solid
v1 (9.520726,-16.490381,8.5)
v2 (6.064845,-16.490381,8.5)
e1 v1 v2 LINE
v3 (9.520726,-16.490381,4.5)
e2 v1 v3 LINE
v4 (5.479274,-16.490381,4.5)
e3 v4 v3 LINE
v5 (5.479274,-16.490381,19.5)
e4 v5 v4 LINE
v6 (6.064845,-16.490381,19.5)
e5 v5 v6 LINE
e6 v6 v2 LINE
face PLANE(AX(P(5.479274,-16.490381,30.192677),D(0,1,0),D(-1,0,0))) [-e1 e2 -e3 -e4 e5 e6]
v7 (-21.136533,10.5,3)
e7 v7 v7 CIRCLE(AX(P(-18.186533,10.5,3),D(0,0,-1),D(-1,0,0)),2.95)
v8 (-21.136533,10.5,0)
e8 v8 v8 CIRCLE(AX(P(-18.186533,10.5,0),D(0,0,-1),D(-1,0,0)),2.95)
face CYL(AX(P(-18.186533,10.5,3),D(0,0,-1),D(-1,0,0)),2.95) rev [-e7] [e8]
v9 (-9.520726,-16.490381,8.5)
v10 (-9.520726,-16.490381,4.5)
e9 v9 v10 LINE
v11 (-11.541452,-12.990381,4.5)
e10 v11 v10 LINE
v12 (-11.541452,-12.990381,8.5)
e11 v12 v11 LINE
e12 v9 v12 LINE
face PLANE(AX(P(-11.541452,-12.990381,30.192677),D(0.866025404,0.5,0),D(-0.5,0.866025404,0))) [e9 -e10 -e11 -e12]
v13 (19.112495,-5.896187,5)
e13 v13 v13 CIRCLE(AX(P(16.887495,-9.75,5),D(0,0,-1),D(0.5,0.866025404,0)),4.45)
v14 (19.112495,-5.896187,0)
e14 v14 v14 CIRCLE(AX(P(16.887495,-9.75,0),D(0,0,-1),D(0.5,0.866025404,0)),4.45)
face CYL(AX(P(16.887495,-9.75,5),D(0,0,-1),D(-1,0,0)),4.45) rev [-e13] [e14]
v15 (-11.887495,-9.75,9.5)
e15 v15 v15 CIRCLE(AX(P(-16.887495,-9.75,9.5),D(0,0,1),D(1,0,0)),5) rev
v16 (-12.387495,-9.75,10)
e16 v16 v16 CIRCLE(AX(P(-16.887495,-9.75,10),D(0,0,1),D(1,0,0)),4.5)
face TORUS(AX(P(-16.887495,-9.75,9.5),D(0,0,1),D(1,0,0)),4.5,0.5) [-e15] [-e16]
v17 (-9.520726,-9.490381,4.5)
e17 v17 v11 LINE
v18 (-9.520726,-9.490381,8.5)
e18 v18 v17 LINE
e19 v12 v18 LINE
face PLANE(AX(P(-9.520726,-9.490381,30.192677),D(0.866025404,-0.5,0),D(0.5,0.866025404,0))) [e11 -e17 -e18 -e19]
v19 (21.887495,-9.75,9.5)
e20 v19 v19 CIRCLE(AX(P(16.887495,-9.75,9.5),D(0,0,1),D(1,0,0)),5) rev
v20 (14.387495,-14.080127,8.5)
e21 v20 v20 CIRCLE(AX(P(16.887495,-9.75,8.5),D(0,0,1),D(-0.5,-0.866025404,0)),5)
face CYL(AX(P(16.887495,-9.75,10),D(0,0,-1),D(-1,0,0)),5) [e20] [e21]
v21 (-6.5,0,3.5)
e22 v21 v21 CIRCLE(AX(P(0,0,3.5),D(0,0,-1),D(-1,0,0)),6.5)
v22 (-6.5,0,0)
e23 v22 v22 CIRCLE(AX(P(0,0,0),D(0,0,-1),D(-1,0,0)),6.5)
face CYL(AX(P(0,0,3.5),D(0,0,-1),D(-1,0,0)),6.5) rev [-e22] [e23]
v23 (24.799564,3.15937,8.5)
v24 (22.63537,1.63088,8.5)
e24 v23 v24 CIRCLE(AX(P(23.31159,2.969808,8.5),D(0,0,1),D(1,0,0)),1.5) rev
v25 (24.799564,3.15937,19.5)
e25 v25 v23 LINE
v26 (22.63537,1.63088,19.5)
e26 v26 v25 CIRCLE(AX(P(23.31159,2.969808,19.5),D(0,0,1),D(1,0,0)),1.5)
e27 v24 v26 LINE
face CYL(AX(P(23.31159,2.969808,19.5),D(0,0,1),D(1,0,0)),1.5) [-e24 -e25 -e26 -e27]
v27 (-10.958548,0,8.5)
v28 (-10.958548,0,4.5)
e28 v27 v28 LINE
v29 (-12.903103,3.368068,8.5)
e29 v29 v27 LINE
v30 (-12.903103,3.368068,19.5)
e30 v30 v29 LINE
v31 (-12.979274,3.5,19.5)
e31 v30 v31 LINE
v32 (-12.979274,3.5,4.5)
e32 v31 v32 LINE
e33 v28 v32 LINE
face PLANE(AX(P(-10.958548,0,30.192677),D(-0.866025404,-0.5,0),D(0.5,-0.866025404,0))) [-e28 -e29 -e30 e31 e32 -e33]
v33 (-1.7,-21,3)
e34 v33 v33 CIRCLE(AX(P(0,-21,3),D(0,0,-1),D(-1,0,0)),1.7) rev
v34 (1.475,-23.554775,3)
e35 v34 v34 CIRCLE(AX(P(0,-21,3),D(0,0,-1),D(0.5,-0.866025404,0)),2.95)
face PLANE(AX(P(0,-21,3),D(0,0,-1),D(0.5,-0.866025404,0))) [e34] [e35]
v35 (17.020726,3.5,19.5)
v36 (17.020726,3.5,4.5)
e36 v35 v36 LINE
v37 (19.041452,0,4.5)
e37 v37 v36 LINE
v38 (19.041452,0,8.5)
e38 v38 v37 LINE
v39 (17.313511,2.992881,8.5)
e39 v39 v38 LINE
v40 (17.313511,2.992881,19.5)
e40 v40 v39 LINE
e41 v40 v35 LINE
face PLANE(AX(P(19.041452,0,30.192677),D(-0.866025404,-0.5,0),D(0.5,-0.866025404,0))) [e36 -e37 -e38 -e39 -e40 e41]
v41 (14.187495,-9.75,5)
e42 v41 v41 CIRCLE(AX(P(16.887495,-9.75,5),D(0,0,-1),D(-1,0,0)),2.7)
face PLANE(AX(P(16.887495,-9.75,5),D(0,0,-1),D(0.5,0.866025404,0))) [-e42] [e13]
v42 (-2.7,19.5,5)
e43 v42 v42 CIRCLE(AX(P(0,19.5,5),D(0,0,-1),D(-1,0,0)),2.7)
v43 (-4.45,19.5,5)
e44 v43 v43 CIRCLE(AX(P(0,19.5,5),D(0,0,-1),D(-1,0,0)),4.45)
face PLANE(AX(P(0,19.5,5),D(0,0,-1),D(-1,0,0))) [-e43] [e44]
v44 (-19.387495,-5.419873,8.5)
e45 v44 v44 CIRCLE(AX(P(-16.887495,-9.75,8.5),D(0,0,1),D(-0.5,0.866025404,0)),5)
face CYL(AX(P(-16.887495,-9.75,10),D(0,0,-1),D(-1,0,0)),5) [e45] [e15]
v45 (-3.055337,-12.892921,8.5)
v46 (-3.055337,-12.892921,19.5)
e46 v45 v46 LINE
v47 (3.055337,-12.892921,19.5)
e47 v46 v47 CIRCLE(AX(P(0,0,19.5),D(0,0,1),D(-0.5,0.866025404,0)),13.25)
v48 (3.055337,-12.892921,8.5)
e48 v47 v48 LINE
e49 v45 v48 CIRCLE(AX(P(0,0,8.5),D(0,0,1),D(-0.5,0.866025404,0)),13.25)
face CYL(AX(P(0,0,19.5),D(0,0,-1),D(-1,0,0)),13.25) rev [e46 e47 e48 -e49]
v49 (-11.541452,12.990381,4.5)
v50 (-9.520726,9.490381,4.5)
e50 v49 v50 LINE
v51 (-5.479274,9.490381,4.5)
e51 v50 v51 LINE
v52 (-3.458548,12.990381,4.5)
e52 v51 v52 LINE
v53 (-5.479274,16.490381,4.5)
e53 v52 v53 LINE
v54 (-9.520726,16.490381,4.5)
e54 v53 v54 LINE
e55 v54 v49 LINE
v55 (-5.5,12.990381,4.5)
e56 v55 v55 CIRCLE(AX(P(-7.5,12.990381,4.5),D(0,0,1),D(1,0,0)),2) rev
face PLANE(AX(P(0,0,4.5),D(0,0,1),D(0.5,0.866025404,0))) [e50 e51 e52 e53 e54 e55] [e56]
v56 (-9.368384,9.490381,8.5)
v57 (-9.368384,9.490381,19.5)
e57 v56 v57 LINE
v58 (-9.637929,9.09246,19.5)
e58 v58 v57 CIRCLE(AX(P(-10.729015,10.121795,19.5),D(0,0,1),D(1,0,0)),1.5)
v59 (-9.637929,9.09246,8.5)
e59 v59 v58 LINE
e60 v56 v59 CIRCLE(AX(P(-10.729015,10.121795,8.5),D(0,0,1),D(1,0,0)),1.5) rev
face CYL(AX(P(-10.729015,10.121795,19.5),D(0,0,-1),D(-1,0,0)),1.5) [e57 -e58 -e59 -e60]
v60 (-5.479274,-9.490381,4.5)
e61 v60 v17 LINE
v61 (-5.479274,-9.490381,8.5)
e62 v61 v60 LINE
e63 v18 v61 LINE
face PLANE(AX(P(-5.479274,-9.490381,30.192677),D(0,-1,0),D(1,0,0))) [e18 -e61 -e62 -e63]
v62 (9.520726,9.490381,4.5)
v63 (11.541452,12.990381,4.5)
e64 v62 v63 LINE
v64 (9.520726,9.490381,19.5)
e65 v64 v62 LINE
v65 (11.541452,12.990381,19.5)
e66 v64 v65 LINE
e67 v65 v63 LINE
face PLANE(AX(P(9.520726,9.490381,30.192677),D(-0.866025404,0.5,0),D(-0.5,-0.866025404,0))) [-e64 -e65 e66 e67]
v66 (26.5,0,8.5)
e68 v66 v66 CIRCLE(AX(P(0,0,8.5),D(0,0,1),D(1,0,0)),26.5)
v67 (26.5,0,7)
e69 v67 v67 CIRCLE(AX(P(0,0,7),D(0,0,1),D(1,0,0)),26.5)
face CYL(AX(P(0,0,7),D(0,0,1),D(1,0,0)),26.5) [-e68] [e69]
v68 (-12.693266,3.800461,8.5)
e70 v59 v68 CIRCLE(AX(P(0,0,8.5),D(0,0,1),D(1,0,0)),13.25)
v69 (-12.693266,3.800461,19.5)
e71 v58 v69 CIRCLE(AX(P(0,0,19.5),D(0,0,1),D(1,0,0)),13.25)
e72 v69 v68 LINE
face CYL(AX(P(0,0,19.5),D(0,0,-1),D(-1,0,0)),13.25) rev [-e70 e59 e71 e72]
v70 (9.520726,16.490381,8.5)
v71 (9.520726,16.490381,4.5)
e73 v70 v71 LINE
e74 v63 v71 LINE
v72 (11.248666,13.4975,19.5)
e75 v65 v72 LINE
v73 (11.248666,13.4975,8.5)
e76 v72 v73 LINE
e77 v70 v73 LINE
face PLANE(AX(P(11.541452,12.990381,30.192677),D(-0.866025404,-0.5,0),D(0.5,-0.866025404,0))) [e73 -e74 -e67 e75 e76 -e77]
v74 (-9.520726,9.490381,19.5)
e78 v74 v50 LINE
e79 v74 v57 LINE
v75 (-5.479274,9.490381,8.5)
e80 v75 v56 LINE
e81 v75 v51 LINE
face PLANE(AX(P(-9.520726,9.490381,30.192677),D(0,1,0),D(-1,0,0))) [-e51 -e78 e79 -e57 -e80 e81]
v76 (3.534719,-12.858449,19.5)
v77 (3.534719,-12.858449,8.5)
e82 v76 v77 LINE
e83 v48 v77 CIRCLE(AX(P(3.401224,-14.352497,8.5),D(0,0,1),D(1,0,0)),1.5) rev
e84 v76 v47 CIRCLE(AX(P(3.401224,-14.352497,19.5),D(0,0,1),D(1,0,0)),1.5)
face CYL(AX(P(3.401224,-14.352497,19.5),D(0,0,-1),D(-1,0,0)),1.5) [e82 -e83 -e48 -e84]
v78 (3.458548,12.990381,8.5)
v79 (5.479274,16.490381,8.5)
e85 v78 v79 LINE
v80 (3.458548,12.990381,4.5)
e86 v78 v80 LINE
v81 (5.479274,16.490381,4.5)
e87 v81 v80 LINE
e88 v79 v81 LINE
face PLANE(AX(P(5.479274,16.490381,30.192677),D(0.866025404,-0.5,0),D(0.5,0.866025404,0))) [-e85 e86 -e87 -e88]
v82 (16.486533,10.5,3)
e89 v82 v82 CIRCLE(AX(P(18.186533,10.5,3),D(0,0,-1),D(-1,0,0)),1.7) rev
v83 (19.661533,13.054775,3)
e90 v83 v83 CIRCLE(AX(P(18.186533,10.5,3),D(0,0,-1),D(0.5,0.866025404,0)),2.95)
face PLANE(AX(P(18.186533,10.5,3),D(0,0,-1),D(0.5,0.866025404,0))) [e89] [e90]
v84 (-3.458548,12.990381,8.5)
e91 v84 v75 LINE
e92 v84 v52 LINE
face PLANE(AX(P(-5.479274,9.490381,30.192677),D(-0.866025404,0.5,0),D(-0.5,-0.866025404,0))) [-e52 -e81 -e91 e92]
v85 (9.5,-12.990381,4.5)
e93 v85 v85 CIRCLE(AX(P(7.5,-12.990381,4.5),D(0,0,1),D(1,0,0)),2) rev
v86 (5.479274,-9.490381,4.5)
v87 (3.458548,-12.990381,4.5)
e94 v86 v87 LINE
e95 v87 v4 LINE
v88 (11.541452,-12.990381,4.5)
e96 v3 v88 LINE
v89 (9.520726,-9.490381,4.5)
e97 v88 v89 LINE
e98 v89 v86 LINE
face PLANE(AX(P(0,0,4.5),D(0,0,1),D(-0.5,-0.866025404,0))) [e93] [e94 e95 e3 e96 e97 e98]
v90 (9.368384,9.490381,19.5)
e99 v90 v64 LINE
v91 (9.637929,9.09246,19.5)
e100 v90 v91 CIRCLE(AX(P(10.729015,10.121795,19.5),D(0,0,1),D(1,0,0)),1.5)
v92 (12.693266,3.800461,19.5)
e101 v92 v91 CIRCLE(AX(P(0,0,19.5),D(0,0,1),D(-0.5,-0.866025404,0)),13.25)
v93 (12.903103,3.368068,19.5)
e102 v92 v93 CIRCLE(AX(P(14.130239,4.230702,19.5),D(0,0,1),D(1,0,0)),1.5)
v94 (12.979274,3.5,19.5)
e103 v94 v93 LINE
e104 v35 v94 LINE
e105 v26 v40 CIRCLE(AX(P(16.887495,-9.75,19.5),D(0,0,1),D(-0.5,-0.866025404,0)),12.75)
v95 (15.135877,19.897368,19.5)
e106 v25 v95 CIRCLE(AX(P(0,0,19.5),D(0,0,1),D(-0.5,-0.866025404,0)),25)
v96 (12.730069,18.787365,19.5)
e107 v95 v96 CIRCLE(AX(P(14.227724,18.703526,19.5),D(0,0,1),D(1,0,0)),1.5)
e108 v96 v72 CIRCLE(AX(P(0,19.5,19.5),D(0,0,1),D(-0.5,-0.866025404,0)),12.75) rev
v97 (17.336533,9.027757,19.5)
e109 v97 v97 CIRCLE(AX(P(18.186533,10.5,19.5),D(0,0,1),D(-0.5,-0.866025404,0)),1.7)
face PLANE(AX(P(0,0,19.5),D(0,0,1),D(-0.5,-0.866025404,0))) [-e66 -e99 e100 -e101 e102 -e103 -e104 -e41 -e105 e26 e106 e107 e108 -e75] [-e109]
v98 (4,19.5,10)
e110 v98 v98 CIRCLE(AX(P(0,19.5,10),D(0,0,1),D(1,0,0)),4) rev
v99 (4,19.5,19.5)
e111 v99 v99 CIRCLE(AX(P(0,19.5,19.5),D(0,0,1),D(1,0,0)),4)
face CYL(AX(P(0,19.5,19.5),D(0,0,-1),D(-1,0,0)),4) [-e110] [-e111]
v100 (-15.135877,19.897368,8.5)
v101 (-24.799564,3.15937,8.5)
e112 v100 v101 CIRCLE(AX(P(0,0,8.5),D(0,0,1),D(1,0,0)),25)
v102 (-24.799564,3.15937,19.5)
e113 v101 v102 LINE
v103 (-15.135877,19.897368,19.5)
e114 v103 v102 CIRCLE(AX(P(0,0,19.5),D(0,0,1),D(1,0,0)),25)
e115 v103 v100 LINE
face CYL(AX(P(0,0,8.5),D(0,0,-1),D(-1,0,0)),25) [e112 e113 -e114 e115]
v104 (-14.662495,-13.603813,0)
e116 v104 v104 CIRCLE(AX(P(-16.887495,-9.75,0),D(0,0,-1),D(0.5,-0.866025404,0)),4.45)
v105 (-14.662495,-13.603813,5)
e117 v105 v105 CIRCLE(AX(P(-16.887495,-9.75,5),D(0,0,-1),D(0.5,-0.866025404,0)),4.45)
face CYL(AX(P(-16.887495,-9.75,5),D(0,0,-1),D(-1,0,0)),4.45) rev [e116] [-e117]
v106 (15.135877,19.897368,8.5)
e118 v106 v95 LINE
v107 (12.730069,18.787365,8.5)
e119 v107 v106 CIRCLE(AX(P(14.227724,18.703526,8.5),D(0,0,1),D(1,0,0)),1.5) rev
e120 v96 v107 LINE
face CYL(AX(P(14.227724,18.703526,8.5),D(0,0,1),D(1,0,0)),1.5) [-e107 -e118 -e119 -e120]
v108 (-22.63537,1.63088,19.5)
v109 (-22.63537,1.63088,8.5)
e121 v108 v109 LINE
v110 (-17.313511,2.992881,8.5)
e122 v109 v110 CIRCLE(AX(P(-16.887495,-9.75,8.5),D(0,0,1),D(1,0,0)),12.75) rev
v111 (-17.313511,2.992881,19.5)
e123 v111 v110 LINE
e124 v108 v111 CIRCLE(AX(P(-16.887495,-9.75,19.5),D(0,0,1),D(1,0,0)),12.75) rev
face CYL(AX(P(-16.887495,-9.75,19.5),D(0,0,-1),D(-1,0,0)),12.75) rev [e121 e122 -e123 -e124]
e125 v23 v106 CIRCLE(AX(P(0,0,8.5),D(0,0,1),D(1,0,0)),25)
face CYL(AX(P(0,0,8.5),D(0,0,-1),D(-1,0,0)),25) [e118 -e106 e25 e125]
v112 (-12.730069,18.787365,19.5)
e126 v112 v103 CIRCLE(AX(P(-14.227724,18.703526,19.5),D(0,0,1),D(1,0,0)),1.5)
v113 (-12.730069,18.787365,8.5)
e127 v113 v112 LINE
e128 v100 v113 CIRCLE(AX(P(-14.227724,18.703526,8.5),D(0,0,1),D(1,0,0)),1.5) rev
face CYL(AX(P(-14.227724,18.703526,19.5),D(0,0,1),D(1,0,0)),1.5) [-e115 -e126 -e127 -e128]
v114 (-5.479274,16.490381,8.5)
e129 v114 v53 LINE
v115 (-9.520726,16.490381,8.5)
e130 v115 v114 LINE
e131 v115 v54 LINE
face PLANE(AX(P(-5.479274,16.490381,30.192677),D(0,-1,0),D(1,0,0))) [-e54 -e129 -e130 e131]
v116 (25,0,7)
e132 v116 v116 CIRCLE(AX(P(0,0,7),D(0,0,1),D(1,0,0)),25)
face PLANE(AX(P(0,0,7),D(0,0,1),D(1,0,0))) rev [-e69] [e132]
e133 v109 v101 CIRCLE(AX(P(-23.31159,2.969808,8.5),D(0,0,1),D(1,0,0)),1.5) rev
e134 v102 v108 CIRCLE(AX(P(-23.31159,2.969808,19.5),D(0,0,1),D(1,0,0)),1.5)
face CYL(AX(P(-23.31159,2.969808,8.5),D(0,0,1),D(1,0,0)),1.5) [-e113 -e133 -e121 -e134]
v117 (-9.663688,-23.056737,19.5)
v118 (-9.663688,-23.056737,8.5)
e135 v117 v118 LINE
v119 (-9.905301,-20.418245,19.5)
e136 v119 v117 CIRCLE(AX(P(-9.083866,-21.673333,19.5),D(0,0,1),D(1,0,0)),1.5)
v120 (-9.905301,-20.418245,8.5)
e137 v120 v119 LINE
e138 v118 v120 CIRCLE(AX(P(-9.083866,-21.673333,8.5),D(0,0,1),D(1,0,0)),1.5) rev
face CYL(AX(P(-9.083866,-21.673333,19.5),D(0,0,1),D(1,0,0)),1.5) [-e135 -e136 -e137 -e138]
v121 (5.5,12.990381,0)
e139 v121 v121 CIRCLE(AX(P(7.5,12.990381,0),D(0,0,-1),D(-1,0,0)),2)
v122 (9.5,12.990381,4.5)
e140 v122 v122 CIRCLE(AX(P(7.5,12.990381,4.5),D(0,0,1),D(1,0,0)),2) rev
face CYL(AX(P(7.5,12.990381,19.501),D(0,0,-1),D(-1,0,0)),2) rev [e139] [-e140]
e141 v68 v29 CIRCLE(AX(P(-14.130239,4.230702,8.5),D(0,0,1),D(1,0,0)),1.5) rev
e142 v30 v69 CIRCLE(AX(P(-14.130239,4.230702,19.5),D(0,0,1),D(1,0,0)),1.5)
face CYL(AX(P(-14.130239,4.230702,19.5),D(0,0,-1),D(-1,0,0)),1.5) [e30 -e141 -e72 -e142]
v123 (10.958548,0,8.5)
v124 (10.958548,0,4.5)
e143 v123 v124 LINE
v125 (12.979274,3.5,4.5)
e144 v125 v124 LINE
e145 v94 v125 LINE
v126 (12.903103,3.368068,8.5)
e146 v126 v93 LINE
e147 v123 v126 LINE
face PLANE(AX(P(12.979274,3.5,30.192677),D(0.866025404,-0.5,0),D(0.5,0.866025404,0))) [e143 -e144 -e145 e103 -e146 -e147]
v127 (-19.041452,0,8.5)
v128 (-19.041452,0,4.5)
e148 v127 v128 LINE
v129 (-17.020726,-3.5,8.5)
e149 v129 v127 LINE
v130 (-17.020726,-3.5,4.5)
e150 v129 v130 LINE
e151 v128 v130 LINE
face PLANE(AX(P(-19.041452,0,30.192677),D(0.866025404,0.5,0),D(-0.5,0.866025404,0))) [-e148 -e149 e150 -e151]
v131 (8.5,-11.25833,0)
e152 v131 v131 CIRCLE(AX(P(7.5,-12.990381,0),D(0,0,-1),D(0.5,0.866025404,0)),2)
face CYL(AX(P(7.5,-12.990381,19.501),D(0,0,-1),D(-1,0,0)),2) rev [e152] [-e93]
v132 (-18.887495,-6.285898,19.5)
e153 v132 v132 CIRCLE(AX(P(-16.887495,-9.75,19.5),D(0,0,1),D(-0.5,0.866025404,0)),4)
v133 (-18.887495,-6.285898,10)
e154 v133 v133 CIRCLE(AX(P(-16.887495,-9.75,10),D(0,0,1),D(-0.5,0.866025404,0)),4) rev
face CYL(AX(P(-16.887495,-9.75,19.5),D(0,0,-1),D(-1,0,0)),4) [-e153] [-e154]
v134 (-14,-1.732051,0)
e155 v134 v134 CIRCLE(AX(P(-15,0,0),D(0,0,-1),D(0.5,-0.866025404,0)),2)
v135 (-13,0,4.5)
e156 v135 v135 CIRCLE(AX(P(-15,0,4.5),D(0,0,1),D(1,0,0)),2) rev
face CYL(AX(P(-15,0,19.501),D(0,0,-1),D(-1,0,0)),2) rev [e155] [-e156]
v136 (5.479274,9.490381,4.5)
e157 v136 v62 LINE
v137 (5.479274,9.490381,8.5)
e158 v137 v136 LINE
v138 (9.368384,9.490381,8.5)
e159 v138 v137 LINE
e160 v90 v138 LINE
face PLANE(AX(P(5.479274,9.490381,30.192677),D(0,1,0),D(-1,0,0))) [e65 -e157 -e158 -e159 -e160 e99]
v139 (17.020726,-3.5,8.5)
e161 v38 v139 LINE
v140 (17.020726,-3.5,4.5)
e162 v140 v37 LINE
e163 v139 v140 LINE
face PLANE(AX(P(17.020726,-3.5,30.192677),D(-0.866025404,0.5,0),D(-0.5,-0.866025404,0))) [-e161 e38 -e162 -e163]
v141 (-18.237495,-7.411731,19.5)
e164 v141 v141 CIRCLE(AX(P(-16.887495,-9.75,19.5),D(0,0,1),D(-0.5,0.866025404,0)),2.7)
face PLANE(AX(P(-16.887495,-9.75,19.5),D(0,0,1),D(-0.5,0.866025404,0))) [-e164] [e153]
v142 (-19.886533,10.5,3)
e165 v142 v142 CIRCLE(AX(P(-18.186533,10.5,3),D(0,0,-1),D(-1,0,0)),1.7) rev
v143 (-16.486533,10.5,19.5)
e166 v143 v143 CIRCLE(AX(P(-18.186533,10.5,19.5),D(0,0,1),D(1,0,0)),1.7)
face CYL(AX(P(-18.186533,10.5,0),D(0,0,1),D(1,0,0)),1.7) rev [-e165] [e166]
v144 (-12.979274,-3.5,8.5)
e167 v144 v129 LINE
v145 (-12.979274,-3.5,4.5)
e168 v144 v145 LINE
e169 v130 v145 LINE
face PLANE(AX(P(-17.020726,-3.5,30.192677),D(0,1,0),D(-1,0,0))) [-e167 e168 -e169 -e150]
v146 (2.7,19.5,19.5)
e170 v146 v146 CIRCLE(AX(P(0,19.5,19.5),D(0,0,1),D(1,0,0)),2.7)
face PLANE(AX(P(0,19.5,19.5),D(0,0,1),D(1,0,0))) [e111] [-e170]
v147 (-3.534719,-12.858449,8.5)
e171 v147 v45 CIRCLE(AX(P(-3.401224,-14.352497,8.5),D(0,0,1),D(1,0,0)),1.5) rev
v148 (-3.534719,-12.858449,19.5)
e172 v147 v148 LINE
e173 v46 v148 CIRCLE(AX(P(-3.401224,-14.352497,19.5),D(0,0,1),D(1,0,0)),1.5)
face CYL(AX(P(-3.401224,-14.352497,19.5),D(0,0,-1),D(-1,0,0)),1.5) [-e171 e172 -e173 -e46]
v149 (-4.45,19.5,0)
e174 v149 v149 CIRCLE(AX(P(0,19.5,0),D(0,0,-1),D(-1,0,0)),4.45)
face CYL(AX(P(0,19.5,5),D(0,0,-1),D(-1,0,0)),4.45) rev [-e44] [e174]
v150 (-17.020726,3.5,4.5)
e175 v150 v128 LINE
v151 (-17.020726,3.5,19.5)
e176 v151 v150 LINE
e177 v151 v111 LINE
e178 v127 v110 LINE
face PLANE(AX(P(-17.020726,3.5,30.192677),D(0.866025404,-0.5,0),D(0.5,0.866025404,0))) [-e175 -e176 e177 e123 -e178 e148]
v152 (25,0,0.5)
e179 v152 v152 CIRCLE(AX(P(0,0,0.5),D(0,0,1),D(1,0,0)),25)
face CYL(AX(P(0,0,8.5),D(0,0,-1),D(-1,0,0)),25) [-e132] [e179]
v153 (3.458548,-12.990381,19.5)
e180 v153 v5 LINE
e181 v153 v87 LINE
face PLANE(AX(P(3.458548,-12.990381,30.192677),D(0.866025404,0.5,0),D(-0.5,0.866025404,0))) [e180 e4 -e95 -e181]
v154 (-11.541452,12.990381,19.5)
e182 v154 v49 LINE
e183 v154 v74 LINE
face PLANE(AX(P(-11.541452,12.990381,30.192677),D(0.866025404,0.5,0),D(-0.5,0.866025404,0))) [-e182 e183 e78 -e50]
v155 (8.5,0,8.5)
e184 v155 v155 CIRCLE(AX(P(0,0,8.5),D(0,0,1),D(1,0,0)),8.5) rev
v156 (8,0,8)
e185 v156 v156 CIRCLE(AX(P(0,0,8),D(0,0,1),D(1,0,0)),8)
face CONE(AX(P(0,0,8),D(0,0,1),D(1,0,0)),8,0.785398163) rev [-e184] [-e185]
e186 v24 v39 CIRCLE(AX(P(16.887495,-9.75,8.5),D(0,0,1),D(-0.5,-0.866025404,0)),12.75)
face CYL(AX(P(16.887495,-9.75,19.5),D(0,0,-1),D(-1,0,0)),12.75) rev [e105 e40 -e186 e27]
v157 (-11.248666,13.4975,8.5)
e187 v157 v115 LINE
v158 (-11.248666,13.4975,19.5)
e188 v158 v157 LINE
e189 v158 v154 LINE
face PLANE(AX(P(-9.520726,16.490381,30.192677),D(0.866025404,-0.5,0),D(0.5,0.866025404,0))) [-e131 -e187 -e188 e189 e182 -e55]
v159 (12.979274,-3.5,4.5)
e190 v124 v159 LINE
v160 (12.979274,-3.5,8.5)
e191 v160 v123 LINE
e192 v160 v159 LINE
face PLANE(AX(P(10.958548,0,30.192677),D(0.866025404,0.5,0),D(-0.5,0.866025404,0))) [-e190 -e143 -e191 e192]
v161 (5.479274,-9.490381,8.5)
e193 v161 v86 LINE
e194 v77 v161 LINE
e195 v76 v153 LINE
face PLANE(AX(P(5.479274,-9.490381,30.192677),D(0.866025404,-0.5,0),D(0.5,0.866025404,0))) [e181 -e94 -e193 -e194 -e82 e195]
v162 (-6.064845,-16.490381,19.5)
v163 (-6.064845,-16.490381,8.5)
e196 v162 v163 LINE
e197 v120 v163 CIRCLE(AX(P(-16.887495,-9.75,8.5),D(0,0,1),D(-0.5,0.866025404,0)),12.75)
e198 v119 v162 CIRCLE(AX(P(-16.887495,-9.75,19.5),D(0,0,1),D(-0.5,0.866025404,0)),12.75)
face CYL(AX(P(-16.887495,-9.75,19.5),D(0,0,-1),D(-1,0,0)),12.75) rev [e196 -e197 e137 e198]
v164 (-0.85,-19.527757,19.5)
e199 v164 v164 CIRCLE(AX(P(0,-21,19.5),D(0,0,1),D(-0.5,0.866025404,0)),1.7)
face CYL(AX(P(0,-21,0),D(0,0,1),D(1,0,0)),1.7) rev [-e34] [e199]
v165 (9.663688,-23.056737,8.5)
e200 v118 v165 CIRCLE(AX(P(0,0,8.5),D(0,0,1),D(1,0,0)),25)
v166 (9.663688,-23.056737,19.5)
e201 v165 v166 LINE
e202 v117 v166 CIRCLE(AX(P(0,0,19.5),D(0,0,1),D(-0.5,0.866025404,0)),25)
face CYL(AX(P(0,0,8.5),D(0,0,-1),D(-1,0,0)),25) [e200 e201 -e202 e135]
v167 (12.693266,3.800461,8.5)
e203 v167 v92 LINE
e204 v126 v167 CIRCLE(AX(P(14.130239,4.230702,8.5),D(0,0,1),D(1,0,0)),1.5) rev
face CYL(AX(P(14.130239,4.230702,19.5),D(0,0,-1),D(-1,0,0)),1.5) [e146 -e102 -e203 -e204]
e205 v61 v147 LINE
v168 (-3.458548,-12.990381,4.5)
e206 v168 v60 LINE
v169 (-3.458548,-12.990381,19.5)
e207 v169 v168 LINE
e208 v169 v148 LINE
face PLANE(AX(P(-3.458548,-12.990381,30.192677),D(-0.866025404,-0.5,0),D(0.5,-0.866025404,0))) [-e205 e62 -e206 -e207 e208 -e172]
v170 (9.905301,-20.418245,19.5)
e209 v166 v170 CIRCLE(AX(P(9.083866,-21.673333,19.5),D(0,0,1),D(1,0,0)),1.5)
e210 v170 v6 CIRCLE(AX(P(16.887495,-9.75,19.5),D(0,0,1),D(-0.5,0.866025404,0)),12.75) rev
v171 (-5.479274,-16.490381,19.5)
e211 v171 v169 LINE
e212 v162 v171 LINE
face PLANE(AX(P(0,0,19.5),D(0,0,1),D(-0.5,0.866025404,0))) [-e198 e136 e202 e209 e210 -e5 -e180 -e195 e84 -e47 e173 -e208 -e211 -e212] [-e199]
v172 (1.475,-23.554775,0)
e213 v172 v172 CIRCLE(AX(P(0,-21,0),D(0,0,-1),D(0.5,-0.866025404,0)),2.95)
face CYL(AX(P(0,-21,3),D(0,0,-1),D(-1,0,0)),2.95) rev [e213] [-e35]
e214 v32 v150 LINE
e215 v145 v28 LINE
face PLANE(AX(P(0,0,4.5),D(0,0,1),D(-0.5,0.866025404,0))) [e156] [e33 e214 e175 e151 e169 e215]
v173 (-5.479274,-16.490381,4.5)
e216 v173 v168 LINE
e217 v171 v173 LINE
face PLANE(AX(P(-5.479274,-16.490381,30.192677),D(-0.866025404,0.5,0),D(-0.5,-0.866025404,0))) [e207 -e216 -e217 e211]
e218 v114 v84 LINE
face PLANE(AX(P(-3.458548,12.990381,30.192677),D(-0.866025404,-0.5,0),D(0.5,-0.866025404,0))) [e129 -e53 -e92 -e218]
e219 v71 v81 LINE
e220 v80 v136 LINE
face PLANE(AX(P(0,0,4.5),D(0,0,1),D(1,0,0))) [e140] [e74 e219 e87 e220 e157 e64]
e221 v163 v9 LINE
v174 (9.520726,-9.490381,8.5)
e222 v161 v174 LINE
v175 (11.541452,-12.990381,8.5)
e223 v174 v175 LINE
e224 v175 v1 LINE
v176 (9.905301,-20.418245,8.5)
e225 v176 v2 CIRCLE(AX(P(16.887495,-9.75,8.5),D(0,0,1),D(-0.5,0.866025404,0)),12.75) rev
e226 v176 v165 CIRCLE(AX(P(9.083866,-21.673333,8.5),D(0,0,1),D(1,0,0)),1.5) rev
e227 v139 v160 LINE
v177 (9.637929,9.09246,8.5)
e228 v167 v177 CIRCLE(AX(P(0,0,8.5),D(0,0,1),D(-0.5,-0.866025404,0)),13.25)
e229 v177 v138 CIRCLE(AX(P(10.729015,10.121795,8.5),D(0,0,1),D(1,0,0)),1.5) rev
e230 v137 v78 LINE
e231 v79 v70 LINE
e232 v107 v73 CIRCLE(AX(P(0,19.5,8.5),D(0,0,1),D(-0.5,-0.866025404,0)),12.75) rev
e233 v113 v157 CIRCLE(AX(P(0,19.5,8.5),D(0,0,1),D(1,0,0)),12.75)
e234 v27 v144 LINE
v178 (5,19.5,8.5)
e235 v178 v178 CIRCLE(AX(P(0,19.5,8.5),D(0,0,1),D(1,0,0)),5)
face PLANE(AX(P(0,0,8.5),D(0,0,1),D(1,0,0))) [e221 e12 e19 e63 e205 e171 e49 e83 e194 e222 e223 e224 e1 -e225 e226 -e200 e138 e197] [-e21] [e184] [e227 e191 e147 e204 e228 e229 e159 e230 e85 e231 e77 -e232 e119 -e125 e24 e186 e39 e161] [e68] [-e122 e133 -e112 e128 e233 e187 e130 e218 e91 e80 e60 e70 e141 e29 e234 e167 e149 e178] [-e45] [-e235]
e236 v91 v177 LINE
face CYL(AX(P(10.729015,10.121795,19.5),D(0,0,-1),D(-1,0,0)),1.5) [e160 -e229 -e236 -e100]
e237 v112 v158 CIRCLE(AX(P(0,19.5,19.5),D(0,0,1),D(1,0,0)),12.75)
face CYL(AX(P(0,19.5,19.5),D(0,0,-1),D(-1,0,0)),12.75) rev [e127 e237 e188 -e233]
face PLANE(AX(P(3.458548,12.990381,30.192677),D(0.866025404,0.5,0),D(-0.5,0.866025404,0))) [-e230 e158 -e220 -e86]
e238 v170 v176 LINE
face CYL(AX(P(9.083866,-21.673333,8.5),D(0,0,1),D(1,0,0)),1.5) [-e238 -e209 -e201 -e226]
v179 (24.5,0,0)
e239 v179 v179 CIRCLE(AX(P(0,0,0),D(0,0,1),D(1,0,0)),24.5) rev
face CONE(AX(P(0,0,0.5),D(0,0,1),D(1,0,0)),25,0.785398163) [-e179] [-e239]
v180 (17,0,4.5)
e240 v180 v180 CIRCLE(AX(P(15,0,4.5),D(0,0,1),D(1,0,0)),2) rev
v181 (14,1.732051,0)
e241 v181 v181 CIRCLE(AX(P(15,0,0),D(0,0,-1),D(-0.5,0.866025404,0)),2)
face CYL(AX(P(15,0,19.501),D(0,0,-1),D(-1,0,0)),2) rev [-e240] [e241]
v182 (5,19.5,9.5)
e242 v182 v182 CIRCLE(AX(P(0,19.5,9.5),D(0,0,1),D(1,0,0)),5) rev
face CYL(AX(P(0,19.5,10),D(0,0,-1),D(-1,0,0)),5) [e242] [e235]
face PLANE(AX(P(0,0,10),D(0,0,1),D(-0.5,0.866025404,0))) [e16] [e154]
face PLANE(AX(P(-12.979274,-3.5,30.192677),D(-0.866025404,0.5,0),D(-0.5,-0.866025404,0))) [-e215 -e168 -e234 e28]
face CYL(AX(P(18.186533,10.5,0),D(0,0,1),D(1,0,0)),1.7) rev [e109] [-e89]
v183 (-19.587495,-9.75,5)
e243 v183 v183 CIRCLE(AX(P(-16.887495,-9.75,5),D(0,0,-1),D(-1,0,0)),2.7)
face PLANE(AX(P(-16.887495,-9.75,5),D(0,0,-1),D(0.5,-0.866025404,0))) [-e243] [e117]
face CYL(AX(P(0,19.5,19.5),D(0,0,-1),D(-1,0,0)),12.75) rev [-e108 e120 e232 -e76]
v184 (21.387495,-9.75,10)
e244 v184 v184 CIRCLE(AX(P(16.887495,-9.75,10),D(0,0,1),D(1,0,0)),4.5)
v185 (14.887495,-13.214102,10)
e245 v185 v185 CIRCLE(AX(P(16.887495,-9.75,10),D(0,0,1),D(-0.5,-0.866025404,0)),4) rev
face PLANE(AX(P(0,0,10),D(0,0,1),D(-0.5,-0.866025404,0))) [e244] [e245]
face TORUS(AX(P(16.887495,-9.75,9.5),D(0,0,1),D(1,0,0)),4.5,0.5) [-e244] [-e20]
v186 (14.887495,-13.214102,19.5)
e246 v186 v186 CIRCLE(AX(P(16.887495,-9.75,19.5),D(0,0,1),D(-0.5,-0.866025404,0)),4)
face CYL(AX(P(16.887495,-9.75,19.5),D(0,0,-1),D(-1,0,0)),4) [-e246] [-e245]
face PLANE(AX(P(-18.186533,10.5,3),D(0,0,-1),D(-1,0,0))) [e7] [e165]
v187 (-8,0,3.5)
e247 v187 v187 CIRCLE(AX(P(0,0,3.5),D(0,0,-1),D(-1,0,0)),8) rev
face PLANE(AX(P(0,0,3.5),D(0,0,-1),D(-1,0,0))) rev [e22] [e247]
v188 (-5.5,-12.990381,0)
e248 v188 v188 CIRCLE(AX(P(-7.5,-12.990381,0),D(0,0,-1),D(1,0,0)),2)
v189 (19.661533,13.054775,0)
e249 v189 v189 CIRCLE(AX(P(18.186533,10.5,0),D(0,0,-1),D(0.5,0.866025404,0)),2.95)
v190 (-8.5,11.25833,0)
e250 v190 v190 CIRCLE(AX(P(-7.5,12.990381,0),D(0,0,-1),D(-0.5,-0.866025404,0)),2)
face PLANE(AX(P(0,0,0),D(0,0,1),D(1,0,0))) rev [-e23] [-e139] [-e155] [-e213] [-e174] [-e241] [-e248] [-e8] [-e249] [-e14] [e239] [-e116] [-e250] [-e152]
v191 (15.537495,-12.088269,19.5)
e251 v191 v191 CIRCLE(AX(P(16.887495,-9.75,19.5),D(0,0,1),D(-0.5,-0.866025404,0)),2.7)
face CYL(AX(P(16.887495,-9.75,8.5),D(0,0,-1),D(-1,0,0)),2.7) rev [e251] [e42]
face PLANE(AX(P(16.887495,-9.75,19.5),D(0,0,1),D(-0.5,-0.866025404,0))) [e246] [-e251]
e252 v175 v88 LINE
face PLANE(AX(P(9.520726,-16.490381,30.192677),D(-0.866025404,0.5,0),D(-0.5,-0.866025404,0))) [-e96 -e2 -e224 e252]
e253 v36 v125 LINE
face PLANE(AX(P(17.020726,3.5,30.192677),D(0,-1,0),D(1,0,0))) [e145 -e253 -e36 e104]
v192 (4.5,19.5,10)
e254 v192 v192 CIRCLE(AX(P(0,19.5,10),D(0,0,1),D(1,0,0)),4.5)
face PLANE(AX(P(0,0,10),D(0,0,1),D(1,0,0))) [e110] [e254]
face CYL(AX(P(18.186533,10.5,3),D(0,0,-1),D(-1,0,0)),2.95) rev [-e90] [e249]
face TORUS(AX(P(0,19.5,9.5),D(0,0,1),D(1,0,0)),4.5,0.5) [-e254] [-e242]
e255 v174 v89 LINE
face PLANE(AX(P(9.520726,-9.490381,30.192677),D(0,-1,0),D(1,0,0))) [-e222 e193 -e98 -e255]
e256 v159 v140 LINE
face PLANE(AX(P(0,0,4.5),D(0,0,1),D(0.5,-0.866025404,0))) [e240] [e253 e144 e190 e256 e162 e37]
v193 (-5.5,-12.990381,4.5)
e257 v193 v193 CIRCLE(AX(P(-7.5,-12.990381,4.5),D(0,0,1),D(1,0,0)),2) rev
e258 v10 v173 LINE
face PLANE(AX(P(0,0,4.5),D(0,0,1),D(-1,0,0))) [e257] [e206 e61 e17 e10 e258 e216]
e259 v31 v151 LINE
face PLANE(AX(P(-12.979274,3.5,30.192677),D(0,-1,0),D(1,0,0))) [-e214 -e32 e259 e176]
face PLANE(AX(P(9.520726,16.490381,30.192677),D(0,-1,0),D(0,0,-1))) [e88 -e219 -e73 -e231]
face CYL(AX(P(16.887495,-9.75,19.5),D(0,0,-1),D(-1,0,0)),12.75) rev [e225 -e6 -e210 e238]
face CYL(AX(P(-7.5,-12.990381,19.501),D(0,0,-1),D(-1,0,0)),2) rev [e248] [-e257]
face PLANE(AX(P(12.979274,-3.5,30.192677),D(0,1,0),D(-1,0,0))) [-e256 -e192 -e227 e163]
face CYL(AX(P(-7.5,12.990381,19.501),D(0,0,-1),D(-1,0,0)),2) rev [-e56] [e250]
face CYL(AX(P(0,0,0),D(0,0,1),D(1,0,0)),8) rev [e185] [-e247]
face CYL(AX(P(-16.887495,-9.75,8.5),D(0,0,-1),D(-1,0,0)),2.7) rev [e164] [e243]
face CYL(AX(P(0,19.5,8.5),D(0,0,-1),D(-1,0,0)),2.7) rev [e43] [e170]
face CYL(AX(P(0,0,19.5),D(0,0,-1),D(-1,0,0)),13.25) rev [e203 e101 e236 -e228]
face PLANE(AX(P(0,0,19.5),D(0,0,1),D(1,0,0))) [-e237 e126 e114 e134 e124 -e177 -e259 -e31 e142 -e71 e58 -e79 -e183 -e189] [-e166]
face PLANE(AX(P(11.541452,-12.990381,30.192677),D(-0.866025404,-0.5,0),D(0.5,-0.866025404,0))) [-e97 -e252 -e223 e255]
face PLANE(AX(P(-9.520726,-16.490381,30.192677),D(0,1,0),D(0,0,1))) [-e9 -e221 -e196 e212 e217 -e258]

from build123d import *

# Parameters (mm, degrees)
SKETCH1_R                      = 25
SKETCH1_R_2                    = 2.7
SKETCH1_R_3                    = 2.700000000000001
BOSS_EXTRUDE1_DEPTH            = 8.5
SKETCH2_R                      = 4.0000000000000036
SKETCH2_R_2                    = 2.7
BOSS_EXTRUDE2_DEPTH            = 11
SKETCH3_R                      = 5.0000000000000036
SKETCH3_R_2                    = 4.0000000000000036
BOSS_EXTRUDE3_DEPTH            = 1.5
BOSS_EXTRUDE4_DEPTH            = 11
FILLET2_R                      = 0.5
FILLET5_R                      = 1.5
CIRPATTERN1_START              = 8.5
CIRPATTERN1_DEPTH              = 11
SKETCH5_R                      = 1.6999999999999988
CUT_EXTRUDE1_DEPTH             = 41.37635463857529
SKETCH6_R                      = 2.9500000000000006
CUT_EXTRUDE2_DEPTH             = 3
SKETCH7_R                      = 4.45
CUT_EXTRUDE3_DEPTH             = 5
CIRPATTERN2_COUNT              = 3
CHAMFER1_SIZE                  = 0.5
SKETCH9_R                      = 8
CUT_EXTRUDE4_DEPTH             = 38.02701732789181
BOSS_EXTRUDE7_START            = -3.5
SKETCH10_R                     = 8
SKETCH10_R_2                   = 6.500000000000002
BOSS_EXTRUDE7_DEPTH            = 3.5
CHAMFER2_SIZE                  = 0.5
BOSS_EXTRUDE8_START            = -1.5
SKETCH11_R                     = 26.500000000000004
SKETCH11_R_2                   = 25
BOSS_EXTRUDE8_DEPTH            = 1.5
CUT_EXTRUDE7_REACH             = 44.246
SKETCH14_R                     = 1.9999999999999996
CUT_EXTRUDE8_DEPTH             = 4
CUT_EXTRUDE8_DIRECTION_2_REACH = 41.058
CIRPATTERN4_COUNT              = 6


# Read off the part's stored shape, not the designer's step: CirPattern1
with BuildPart() as part:
    # Sketch1 → Boss-Extrude1 (new body)
    with BuildSketch(Plane.XY):
        Circle(SKETCH1_R)
        with Locations((0, 19.5)):
            Circle(SKETCH1_R_2, mode=Mode.SUBTRACT)
        with Locations((16.88749537379534, -9.750000000002105)):
            Circle(SKETCH1_R_3, mode=Mode.SUBTRACT)
        with Locations((-16.88749537379899, -9.750000000000009)):
            Circle(SKETCH1_R_3, mode=Mode.SUBTRACT)
    extrude(amount=BOSS_EXTRUDE1_DEPTH)

    # Sketch2 → Boss-Extrude2 (add)
    with BuildSketch(Plane.XY.offset(8.5)):
        with Locations((0, 19.5)):
            Circle(SKETCH2_R)
        with Locations((0, 19.5)):
            Circle(SKETCH2_R_2, mode=Mode.SUBTRACT)
    extrude(amount=BOSS_EXTRUDE2_DEPTH)

    # Sketch3 → Boss-Extrude3 (add)
    with BuildSketch(Plane.XY.offset(8.5)):
        with Locations((0, 19.5)):
            Circle(SKETCH3_R)
        with Locations((0, 19.5)):
            Circle(SKETCH3_R_2, mode=Mode.SUBTRACT)
    extrude(amount=BOSS_EXTRUDE3_DEPTH)

    # Sketch4 → Boss-Extrude4 (add)
    with BuildSketch(Plane.XY.offset(8.5)):
        with BuildLine():
            ThreePointArc((-8.595864638818421, 10.083333333333332), (-12.051904233708413, 15.338977969113694), (-12.57463654020182, 21.6073717948718))
            ThreePointArc((-12.57463654020182, 21.607371794871796), (-21.650635094611, 12.499999999999941), (-24.999851153475248, 0.08626878973480237))
            ThreePointArc((-24.999851153475245, 0.08626878973480423), (-19.309896706196515, 2.7677662458117602), (-13.030355140902314, 2.402570478042364))
            ThreePointArc((-13.030355140902312, 2.402570478042366), (-11.474836600143831, 6.62499999999997), (-8.595864638818423, 10.08333333333333))
        make_face()
    extrude(amount=BOSS_EXTRUDE4_DEPTH)

    # Fillet2
    fillet2_edges = [part.edges().sort_by_distance(p)[0] for p in [
        (-5.0000000000000036, 19.5, 10),
    ]]
    fillet(fillet2_edges, radius=FILLET2_R)

    # Fillet5
    fillet5_edges = [part.edges().sort_by_distance(p)[0] for p in [
        (-12.57463654020182, 21.607371794871796, 14),
        (-24.999851153475248, 0.08626878973480534, 14),
        (-13.030355140902312, 2.4025704780423656, 14),
        (-8.59586463881842, 10.083333333333332, 14),
    ]]
    fillet(fillet5_edges, radius=FILLET5_R)

    # CirPattern1 outline → CirPattern1 (add)
    with BuildSketch(Plane.XY.offset(CIRPATTERN1_START)):
        with BuildLine():
            ThreePointArc((-3.055336686, -12.892921226), (-4.126430807, -13.039456894), (-4.820831386, -13.868023823))
            ThreePointArc((-4.820831386, -13.868023823), (-6.81569801, -17.568017515), (-9.905301006, -20.418245489))
            ThreePointArc((-9.905301006, -20.418245489), (-10.577616507, -21.810119667), (-9.663687632, -23.056737439))
            ThreePointArc((-9.663687632, -23.056737439), (0, -25), (9.663687632, -23.056737439))
            ThreePointArc((9.663687632, -23.056737439), (10.577616507, -21.810119667), (9.905301006, -20.418245489))
            ThreePointArc((9.905301006, -20.418245489), (6.81569801, -17.568017515), (4.820831386, -13.868023823))
            ThreePointArc((4.820831386, -13.868023823), (4.126430807, -13.039456894), (3.055336686, -12.892921226))
            ThreePointArc((3.055336686, -12.892921226), (0, -13.25), (-3.055336686, -12.892921226))
        make_face()
        with BuildLine():
            ThreePointArc((24.799564167, 3.159369736), (21.650635095, 12.5), (15.135876535, 19.897367703))
            ThreePointArc((15.135876535, 19.897367703), (13.599309437, 20.06554444), (12.730068791, 18.787365047))
            ThreePointArc((12.730068791, 18.787365047), (11.806500457, 14.686576379), (9.599645238, 11.108974359))
            ThreePointArc((9.599645238, 11.108974359), (9.229285518, 10.093322353), (9.637928968, 9.0924598))
            ThreePointArc((9.637928968, 9.0924598), (11.4748366, 6.625), (12.693265654, 3.800461426))
            ThreePointArc((12.693265654, 3.800461426), (13.355716326, 2.946134541), (14.420476624, 2.759049464))
            ThreePointArc((14.420476624, 2.759049464), (18.622198468, 2.881441136), (22.635369797, 1.630880441))
            ThreePointArc((22.635369797, 1.630880441), (24.176925945, 1.744575226), (24.799564167, 3.159369736))
        make_face()
    extrude(amount=CIRPATTERN1_DEPTH)

    # CirPattern1 2 outline → CirPattern1 2 (revolve)
    with BuildSketch(Plane(origin=(-16.887495374, -9.75, 0), x_dir=(1, 0, 0), z_dir=(0, -1, 0))):
        with BuildLine():
            Line((4, 19.5), (2.7, 19.5))
            Line((2.7, 19.5), (2.7, 8.5))
            Line((2.7, 8.5), (5, 8.5))
            Line((5, 8.5), (5, 9.5))
            ThreePointArc((5, 9.5), (4.853553391, 9.853553391), (4.5, 10))
            Line((4.5, 10), (4, 10))
            Line((4, 10), (4, 19.5))
        make_face()
    revolve(axis=Axis((-16.887495374, -9.75, 0), (0, 0, 1)))

    # CirPattern1 3 outline → CirPattern1 3 (revolve)
    with BuildSketch(Plane(origin=(16.887495374, -9.75, 0), x_dir=(1, 0, 0), z_dir=(0, -1, 0))):
        with BuildLine():
            Line((4, 19.5), (2.7, 19.5))
            Line((2.7, 19.5), (2.7, 8.5))
            Line((2.7, 8.5), (5, 8.5))
            Line((5, 8.5), (5, 9.5))
            ThreePointArc((5, 9.5), (4.853553391, 9.853553391), (4.5, 10))
            Line((4.5, 10), (4, 10))
            Line((4, 10), (4, 19.5))
        make_face()
    revolve(axis=Axis((16.887495374, -9.75, 0), (0, 0, 1)))

    # Sketch5 → Cut-Extrude1 (cut, through all)
    with BuildSketch(Plane.XY.offset(19.5)):
        with Locations((-18.186533479473244, 10.499999999999957)):
            Circle(SKETCH5_R)
    cut_extrude1 = extrude(amount=-CUT_EXTRUDE1_DEPTH, mode=Mode.SUBTRACT)

    # Sketch6 → Cut-Extrude2 (cut)
    with BuildSketch(Plane(origin=(0, 0, 0), x_dir=(-1, 0, 0), z_dir=(0, 0, -1))):
        with Locations((18.186533479473244, 10.499999999999956)):
            Circle(SKETCH6_R)
    cut_extrude2 = extrude(amount=-CUT_EXTRUDE2_DEPTH, mode=Mode.SUBTRACT)

    # Sketch7 → Cut-Extrude3 (cut)
    with BuildSketch(Plane(origin=(0, 0, 0), x_dir=(-1, 0, 0), z_dir=(0, 0, -1))):
        with Locations((0, 19.5)):
            Circle(SKETCH7_R)
    cut_extrude3 = extrude(amount=-CUT_EXTRUDE3_DEPTH, mode=Mode.SUBTRACT)

    # CirPattern2: Cut-Extrude1, Cut-Extrude2, Cut-Extrude3 ×3 about axis
    cirpattern2_axis = Axis((4.8e-16, -1.84e-15, 0), (0, 0, 1))
    add([cut_extrude1.rotate(cirpattern2_axis, i * 360 / CIRPATTERN2_COUNT) for i in range(1, CIRPATTERN2_COUNT)], mode=Mode.SUBTRACT)
    add([cut_extrude2.rotate(cirpattern2_axis, i * 360 / CIRPATTERN2_COUNT) for i in range(1, CIRPATTERN2_COUNT)], mode=Mode.SUBTRACT)
    add([cut_extrude3.rotate(cirpattern2_axis, i * 360 / CIRPATTERN2_COUNT) for i in range(1, CIRPATTERN2_COUNT)], mode=Mode.SUBTRACT)

    # Chamfer1
    chamfer1_edges = [part.edges().sort_by_distance(p)[0] for p in [
        (-25, 3.06e-15, 0),
    ]]
    chamfer(chamfer1_edges, length=CHAMFER1_SIZE)

    # Sketch9 → Cut-Extrude4 (cut, through all)
    with BuildSketch(Plane.XY.offset(8.5)):
        Circle(SKETCH9_R)
    extrude(amount=-CUT_EXTRUDE4_DEPTH, mode=Mode.SUBTRACT)

    # Sketch10 → Boss-Extrude7 (add)
    with BuildSketch(Plane(origin=(0, 0, 0), x_dir=(-1, 0, 0), z_dir=(0, 0, -1)).offset(BOSS_EXTRUDE7_START)):
        with Locations(Location((0, 0, 0), (0, 0, 180))):
            Circle(SKETCH10_R)
        Circle(SKETCH10_R_2, mode=Mode.SUBTRACT)
    extrude(amount=BOSS_EXTRUDE7_DEPTH)

    # Chamfer2
    chamfer2_edges = [part.edges().sort_by_distance(p)[0] for p in [
        (-8, 9.8e-16, 8.5),
    ]]
    chamfer(chamfer2_edges, length=CHAMFER2_SIZE)

    # Sketch11 → Boss-Extrude8 (add)
    with BuildSketch(Plane.XY.offset(8.5).offset(BOSS_EXTRUDE8_START)):
        Circle(SKETCH11_R)
        Circle(SKETCH11_R_2, mode=Mode.SUBTRACT)
    extrude(amount=BOSS_EXTRUDE8_DEPTH)

    # Sketch14 → Cut-Extrude7 (cut, up to next)
    with BuildSketch(Plane(origin=(0, 0, 0), x_dir=(-1, 0, 0), z_dir=(0, 0, -1)), mode=Mode.PRIVATE) as cut_extrude7_sk1:
        with Locations((-7.499999999999925, 12.990381056766624)):
            Circle(SKETCH14_R)
    cut_extrude7_tool1 = extrude(cut_extrude7_sk1.sketch, amount=-CUT_EXTRUDE7_REACH, mode=Mode.PRIVATE) & part.part
    cut_extrude7 = cut_extrude7_tool1.solids().sort_by_distance((7.5, 12.990381, 0))[0]
    add(cut_extrude7, mode=Mode.SUBTRACT)

    # Sketch15 → Cut-Extrude8 (cut)
    with BuildSketch(Plane.XY.offset(8.5)):
        Polygon((9.520725942163613, 9.49038105676663), (11.5414518843273, 12.990381056766624), (9.520725942163615, 16.49038105676662), (5.4792740578362364, 16.49038105676662), (3.4585481156725493, 12.990381056766624), (5.479274057836236, 9.490381056766628), align=None)
    cut_extrude8 = extrude(amount=-CUT_EXTRUDE8_DEPTH, mode=Mode.SUBTRACT)

    # Sketch15 → Cut-Extrude8 direction 2 (cut, up to next)
    with BuildSketch(Plane.XY.offset(8.5), mode=Mode.PRIVATE) as cut_extrude8_direction_2_sk1:
        Polygon((9.520725942163613, 9.49038105676663), (11.5414518843273, 12.990381056766624), (9.520725942163615, 16.49038105676662), (5.4792740578362364, 16.49038105676662), (3.4585481156725493, 12.990381056766624), (5.479274057836236, 9.490381056766628), align=None)
    cut_extrude8_direction_2_tool1 = extrude(cut_extrude8_direction_2_sk1.sketch, amount=CUT_EXTRUDE8_DIRECTION_2_REACH, mode=Mode.PRIVATE) & part.part
    cut_extrude8_direction_2 = cut_extrude8_direction_2_tool1.solids().sort_by_distance((7.5, 12.990381, 8.5))[0]
    add(cut_extrude8_direction_2, mode=Mode.SUBTRACT)

    # CirPattern4: Cut-Extrude7, Cut-Extrude8, Cut-Extrude8 direction 2; each copy of Cut-Extrude7, Cut-Extrude8 direction 2 runs up to whatever stops it at its own place
    cirpattern4_before = part.part  # the part as the pattern finds it: every copy runs up to it
    cirpattern4_cut_extrude7_long = extrude(cut_extrude7_sk1.sketch, amount=-CUT_EXTRUDE7_REACH, mode=Mode.PRIVATE)
    cirpattern4_cut_extrude7_tool1 = cirpattern4_cut_extrude7_long.rotate(Axis((-3.9e-15, 2.33e-15, 0), (0, 0, 1)), 1 * 360 / CIRPATTERN4_COUNT) & cirpattern4_before
    add(cirpattern4_cut_extrude7_tool1.solids().sort_by_distance((-7.5, 12.990381, 0))[0], mode=Mode.SUBTRACT)
    cirpattern4_cut_extrude7_tool2 = cirpattern4_cut_extrude7_long.rotate(Axis((-3.9e-15, 2.33e-15, 0), (0, 0, 1)), 2 * 360 / CIRPATTERN4_COUNT) & cirpattern4_before
    add(cirpattern4_cut_extrude7_tool2.solids().sort_by_distance((-15, 0, 0))[0], mode=Mode.SUBTRACT)
    cirpattern4_cut_extrude7_tool3 = cirpattern4_cut_extrude7_long.rotate(Axis((-3.9e-15, 2.33e-15, 0), (0, 0, 1)), 3 * 360 / CIRPATTERN4_COUNT) & cirpattern4_before
    add(cirpattern4_cut_extrude7_tool3.solids().sort_by_distance((-7.5, -12.990381, 0))[0], mode=Mode.SUBTRACT)
    cirpattern4_cut_extrude7_tool4 = cirpattern4_cut_extrude7_long.rotate(Axis((-3.9e-15, 2.33e-15, 0), (0, 0, 1)), 4 * 360 / CIRPATTERN4_COUNT) & cirpattern4_before
    add(cirpattern4_cut_extrude7_tool4.solids().sort_by_distance((7.5, -12.990381, 0))[0], mode=Mode.SUBTRACT)
    cirpattern4_cut_extrude7_tool5 = cirpattern4_cut_extrude7_long.rotate(Axis((-3.9e-15, 2.33e-15, 0), (0, 0, 1)), 5 * 360 / CIRPATTERN4_COUNT) & cirpattern4_before
    add(cirpattern4_cut_extrude7_tool5.solids().sort_by_distance((15, 0, 0))[0], mode=Mode.SUBTRACT)
    add(cut_extrude8.rotate(Axis((-3.9e-15, 2.33e-15, 0), (0, 0, 1)), 1 * 360 / CIRPATTERN4_COUNT), mode=Mode.SUBTRACT)
    add(cut_extrude8.rotate(Axis((-3.9e-15, 2.33e-15, 0), (0, 0, 1)), 2 * 360 / CIRPATTERN4_COUNT), mode=Mode.SUBTRACT)
    add(cut_extrude8.rotate(Axis((-3.9e-15, 2.33e-15, 0), (0, 0, 1)), 3 * 360 / CIRPATTERN4_COUNT), mode=Mode.SUBTRACT)
    add(cut_extrude8.rotate(Axis((-3.9e-15, 2.33e-15, 0), (0, 0, 1)), 4 * 360 / CIRPATTERN4_COUNT), mode=Mode.SUBTRACT)
    add(cut_extrude8.rotate(Axis((-3.9e-15, 2.33e-15, 0), (0, 0, 1)), 5 * 360 / CIRPATTERN4_COUNT), mode=Mode.SUBTRACT)
    cirpattern4_cut_extrude8_direction_2_long = extrude(cut_extrude8_direction_2_sk1.sketch, amount=CUT_EXTRUDE8_DIRECTION_2_REACH, mode=Mode.PRIVATE)
    cirpattern4_cut_extrude8_direction_2_tool1 = cirpattern4_cut_extrude8_direction_2_long.rotate(Axis((-3.9e-15, 2.33e-15, 0), (0, 0, 1)), 1 * 360 / CIRPATTERN4_COUNT) & cirpattern4_before
    add(cirpattern4_cut_extrude8_direction_2_tool1.solids().sort_by_distance((-7.5, 12.990381, 8.5))[0], mode=Mode.SUBTRACT)
    cirpattern4_cut_extrude8_direction_2_tool2 = cirpattern4_cut_extrude8_direction_2_long.rotate(Axis((-3.9e-15, 2.33e-15, 0), (0, 0, 1)), 2 * 360 / CIRPATTERN4_COUNT) & cirpattern4_before
    add(cirpattern4_cut_extrude8_direction_2_tool2.solids().sort_by_distance((-15, 0, 8.5))[0], mode=Mode.SUBTRACT)
    cirpattern4_cut_extrude8_direction_2_tool3 = cirpattern4_cut_extrude8_direction_2_long.rotate(Axis((-3.9e-15, 2.33e-15, 0), (0, 0, 1)), 3 * 360 / CIRPATTERN4_COUNT) & cirpattern4_before
    add(cirpattern4_cut_extrude8_direction_2_tool3.solids().sort_by_distance((-7.5, -12.990381, 8.5))[0], mode=Mode.SUBTRACT)
    cirpattern4_cut_extrude8_direction_2_tool4 = cirpattern4_cut_extrude8_direction_2_long.rotate(Axis((-3.9e-15, 2.33e-15, 0), (0, 0, 1)), 4 * 360 / CIRPATTERN4_COUNT) & cirpattern4_before
    add(cirpattern4_cut_extrude8_direction_2_tool4.solids().sort_by_distance((7.5, -12.990381, 8.5))[0], mode=Mode.SUBTRACT)
    cirpattern4_cut_extrude8_direction_2_tool5 = cirpattern4_cut_extrude8_direction_2_long.rotate(Axis((-3.9e-15, 2.33e-15, 0), (0, 0, 1)), 5 * 360 / CIRPATTERN4_COUNT) & cirpattern4_before
    add(cirpattern4_cut_extrude8_direction_2_tool5.solids().sort_by_distance((15, 0, 8.5))[0], mode=Mode.SUBTRACT)


solid = part.part
